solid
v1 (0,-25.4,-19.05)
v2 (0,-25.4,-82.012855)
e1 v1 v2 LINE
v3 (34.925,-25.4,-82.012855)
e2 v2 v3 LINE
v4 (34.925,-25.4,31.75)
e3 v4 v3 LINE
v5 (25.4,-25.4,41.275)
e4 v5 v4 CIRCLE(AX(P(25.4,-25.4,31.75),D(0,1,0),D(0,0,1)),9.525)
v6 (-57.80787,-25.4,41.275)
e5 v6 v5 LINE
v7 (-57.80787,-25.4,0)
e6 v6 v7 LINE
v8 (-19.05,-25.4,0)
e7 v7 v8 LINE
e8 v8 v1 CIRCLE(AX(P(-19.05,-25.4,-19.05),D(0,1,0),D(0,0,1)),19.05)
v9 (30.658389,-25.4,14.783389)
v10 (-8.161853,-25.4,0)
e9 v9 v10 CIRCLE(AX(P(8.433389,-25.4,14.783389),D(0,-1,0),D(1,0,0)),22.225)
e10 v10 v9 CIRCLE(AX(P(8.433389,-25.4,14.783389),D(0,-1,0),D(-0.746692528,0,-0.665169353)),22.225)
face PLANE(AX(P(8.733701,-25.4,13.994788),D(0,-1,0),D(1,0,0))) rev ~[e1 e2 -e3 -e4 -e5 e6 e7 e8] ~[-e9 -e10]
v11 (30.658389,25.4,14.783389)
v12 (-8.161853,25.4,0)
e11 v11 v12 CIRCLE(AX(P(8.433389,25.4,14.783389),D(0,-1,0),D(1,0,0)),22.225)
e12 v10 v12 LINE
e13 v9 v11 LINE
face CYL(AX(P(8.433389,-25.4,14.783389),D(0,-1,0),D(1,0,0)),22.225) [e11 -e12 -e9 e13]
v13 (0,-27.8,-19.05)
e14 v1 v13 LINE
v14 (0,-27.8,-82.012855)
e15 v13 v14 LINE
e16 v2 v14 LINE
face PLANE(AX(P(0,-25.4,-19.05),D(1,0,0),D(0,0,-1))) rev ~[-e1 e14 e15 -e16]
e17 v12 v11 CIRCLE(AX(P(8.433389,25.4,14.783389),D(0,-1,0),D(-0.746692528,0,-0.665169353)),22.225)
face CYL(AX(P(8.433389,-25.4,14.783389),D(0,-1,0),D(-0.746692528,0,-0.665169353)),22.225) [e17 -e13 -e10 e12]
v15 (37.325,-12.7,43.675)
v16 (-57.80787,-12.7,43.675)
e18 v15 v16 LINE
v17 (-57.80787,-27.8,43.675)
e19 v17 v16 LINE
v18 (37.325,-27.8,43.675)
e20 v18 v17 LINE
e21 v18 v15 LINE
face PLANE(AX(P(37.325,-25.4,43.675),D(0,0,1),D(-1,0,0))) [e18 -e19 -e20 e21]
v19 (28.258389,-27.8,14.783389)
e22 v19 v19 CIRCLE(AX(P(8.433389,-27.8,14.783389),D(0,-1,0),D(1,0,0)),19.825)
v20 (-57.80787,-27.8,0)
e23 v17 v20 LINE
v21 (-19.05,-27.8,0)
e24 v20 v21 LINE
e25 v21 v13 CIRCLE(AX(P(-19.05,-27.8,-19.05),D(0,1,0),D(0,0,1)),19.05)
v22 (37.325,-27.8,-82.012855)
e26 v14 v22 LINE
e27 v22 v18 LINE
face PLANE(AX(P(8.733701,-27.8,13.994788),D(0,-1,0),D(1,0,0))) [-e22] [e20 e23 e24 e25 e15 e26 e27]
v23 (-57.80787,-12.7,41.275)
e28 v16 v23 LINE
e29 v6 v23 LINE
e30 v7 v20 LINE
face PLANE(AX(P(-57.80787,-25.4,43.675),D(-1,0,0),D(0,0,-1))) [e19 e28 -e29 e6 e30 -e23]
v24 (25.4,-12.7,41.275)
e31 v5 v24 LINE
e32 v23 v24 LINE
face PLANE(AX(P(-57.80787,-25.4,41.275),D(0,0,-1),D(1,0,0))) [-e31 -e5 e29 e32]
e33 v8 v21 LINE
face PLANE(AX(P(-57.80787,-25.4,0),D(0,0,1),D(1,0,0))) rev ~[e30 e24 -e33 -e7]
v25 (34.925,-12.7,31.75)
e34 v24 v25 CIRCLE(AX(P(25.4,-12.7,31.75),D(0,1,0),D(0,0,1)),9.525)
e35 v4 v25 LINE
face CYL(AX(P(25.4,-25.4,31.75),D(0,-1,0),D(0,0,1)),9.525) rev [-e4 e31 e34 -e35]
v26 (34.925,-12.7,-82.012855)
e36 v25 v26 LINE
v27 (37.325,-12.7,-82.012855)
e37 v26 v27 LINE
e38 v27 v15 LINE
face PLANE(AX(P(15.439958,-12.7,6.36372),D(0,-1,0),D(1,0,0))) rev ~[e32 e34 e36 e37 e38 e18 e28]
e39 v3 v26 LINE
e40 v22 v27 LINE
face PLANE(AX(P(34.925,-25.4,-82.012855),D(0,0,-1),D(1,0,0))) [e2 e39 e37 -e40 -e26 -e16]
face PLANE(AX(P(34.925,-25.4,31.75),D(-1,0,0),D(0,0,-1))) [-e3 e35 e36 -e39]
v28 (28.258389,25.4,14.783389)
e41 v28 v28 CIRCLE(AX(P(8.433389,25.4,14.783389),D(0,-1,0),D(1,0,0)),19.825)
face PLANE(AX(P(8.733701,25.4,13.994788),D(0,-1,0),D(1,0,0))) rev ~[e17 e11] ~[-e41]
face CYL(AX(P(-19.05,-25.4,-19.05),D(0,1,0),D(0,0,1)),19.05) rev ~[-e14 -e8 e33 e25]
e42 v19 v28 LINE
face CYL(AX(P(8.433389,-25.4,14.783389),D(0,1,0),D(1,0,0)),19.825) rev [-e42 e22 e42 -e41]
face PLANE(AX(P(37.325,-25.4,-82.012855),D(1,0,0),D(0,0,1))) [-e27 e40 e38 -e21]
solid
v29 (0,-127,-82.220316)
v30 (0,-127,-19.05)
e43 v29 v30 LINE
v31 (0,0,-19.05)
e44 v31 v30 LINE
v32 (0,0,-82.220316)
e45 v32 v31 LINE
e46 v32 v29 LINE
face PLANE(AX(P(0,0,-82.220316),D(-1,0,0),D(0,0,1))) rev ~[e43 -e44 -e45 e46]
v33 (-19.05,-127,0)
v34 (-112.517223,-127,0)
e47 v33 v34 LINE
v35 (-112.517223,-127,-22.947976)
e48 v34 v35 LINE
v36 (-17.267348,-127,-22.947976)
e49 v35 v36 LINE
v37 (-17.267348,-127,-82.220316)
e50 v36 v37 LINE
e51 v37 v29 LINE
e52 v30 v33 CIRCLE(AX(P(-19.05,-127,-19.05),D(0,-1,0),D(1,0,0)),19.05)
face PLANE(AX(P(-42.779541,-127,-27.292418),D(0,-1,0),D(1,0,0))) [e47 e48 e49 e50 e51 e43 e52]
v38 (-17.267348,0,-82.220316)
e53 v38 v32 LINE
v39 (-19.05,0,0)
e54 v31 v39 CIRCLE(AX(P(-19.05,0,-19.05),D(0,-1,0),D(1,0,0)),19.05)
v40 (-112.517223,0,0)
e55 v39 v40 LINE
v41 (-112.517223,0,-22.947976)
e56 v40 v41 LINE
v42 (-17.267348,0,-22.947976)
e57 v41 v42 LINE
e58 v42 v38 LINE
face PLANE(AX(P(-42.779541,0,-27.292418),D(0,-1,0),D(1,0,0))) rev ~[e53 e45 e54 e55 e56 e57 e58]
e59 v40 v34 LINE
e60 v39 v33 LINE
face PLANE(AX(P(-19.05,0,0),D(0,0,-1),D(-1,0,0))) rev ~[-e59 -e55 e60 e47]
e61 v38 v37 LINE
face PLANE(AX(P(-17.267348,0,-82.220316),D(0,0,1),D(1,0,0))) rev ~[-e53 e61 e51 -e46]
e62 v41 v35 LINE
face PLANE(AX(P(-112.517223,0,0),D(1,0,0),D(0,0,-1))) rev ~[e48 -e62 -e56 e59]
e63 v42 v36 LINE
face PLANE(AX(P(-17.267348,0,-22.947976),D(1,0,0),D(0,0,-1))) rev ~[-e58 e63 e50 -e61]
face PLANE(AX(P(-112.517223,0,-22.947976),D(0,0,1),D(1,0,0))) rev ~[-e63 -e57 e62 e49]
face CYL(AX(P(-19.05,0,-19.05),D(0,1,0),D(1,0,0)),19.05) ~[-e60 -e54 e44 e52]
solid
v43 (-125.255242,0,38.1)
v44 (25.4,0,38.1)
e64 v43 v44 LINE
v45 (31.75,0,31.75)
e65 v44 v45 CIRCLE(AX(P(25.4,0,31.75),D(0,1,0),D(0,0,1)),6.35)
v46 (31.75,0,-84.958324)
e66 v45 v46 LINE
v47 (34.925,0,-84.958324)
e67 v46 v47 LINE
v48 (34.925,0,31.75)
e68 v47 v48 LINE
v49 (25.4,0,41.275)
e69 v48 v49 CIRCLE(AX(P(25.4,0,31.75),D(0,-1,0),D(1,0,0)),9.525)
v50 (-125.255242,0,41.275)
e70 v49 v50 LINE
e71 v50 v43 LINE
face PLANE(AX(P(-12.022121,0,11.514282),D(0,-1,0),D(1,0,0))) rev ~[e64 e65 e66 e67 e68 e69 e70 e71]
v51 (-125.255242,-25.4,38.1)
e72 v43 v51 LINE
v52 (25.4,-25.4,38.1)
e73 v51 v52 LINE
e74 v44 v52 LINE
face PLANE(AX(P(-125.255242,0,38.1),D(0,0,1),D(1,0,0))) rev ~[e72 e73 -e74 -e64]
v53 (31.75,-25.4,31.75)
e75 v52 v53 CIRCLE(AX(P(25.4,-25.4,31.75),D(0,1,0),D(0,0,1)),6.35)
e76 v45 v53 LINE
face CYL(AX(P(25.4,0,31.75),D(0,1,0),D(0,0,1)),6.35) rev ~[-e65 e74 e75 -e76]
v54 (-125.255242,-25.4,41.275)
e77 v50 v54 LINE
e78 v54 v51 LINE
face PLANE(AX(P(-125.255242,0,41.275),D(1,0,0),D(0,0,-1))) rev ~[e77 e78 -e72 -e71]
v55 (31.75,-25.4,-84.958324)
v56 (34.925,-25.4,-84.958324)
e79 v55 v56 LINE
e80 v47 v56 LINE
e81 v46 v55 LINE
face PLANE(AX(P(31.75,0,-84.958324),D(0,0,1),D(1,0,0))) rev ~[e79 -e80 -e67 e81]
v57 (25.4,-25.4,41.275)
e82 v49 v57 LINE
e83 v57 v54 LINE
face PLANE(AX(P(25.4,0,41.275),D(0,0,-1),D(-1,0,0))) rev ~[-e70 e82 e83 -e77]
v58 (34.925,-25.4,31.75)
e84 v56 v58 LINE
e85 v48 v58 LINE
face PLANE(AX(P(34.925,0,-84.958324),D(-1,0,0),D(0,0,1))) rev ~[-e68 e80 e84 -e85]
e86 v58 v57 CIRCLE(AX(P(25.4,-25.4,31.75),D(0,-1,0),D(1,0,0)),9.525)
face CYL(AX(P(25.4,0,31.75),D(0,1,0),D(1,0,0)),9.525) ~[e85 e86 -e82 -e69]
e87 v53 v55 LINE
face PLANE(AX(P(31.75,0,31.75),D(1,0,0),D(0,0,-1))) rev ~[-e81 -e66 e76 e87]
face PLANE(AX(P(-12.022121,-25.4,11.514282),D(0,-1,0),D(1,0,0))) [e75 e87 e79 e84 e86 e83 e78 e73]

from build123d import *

# Parameters (mm, degrees)
F1_DEPTH = 127
F2_DEPTH = 25.4
F4_DEPTH = 2.4
F3_R     = 19.825
F5_DEPTH = 2.4
F6_DEPTH = 50.8
F7_DEPTH = 12.7


# Not quite as in the source:
# - a length typed as a fraction of an inch, garbled in the dataset ("3 / 203.2 mm" for 3/8 in), is restored


with BuildPart() as f1:
    # F0 (on Front) → F1 (new body)
    with BuildSketch(Plane.XZ):
        with BuildLine():
            Line((0, -82.2203159332), (0, -19.05))
            ThreePointArc((0, -19.05), (-5.5796158184, -5.5796158184), (-19.05, 0))
            Line((-19.05, 0), (-112.5172227621, 0))
            Line((-112.5172227621, 0), (-112.5172227621, -22.9479763657))
            Line((-112.5172227621, -22.9479763657), (-17.2673482448, -22.9479763657))
            Line((-17.2673482448, -22.9479763657), (-17.2673482448, -82.2203159332))
            Line((-17.2673482448, -82.2203159332), (0, -82.2203159332))
        make_face()
    extrude(amount=F1_DEPTH)


with BuildPart() as f2:
    # F0 (on Front) → F2 (new body)
    with BuildSketch(Plane.XZ):
        with BuildLine():
            Line((-125.2552419901, 41.275), (-125.2552419901, 38.1))
            Line((-125.2552419901, 38.1), (25.4, 38.1))
            ThreePointArc((25.4, 38.1), (29.8901280605, 36.2401280605), (31.75, 31.75))
            Line((31.75, 31.75), (31.75, -84.9583235416))
            Line((31.75, -84.9583235416), (34.925, -84.9583235416))
            Line((34.925, -84.9583235416), (34.925, 31.75))
            ThreePointArc((34.925, 31.75), (32.1351920908, 38.4851920908), (25.4, 41.275))
            Line((25.4, 41.275), (-125.2552419901, 41.275))
        make_face()
    extrude(amount=F2_DEPTH)


with BuildPart() as f4:
    # F3 (on face) → F4 (new body)
    with BuildSketch(Plane.XZ.offset(25.4)):
        with BuildLine():
            ThreePointArc((-8.1618525748, 0), (0.5238571529, 35.5533174442), (30.6583888685, 14.7833888685))
            ThreePointArc((30.6583888685, 14.7833888685), (20.8131820291, -3.6744372847), (0, -5.7794070793))
            Line((0, -5.7794070793), (0, -19.05))
            Line((0, -19.05), (0, -82.0128545165))
            Line((0, -82.0128545165), (31.75, -82.0128545165))
            Line((31.75, -82.0128545165), (31.75, 31.75))
            ThreePointArc((31.75, 31.75), (29.8901280605, 36.2401280605), (25.4, 38.1))
            Line((25.4, 38.1), (-57.8078702092, 38.1))
            Line((-57.8078702092, 38.1), (-57.8078702092, 0))
            Line((-57.8078702092, 0), (-19.05, 0))
            Line((-19.05, 0), (-8.1618525748, 0))
        make_face()
        with BuildLine():
            ThreePointArc((0, -5.7794070793), (-4.4102270697, -3.3547520128), (-8.1618525748, 0))
            Line((-8.1618525748, 0), (-19.05, 0))
            ThreePointArc((-19.05, 0), (-5.5796158184, -5.5796158184), (0, -19.05))
            Line((0, -19.05), (0, -5.7794070793))
        make_face()
        with BuildLine():
            Line((-57.8078702092, 41.275), (-57.8078702092, 38.1))
            Line((-57.8078702092, 38.1), (25.4, 38.1))
            ThreePointArc((25.4, 38.1), (29.8901280605, 36.2401280605), (31.75, 31.75))
            Line((31.75, 31.75), (31.75, -82.0128545165))
            Line((31.75, -82.0128545165), (34.925, -82.0128545165))
            Line((34.925, -82.0128545165), (34.925, 31.75))
            ThreePointArc((34.925, 31.75), (32.1351920908, 38.4851920908), (25.4, 41.275))
            Line((25.4, 41.275), (-57.8078702092, 41.275))
        make_face()
        with BuildLine():
            Line((-57.8078702092, 43.675), (-57.8078702092, 41.275))
            Line((-57.8078702092, 41.275), (25.4, 41.275))
            ThreePointArc((25.4, 41.275), (32.1351920908, 38.4851920908), (34.925, 31.75))
            Line((34.925, 31.75), (34.925, -82.0128545165))
            Line((34.925, -82.0128545165), (37.325, -82.0128545165))
            Line((37.325, -82.0128545165), (37.325, 43.675))
            Line((37.325, 43.675), (-57.8078702092, 43.675))
        make_face()
    extrude(amount=F4_DEPTH)

    # F3 (on face) → F5 (join, through all)
    with BuildSketch(Plane.XZ.offset(25.4)):
        with BuildLine():
            ThreePointArc((0, -5.7794070793), (20.8131820291, -3.6744372847), (30.6583888685, 14.7833888685))
            ThreePointArc((30.6583888685, 14.7833888685), (0.5238571529, 35.5533174442), (-8.1618525748, 0))
            ThreePointArc((-8.1618525748, 0), (-4.4102270697, -3.3547520128), (0, -5.7794070793))
        make_face()
        with Locations((8.4333888685, 14.7833888685)):
            Circle(F3_R, mode=Mode.SUBTRACT)
    extrude(amount=F5_DEPTH)

    # F3 (on face) → F6 (join)
    with BuildSketch(Plane.XZ.offset(25.4)):
        with BuildLine():
            ThreePointArc((0, -5.7794070793), (20.8131820291, -3.6744372847), (30.6583888685, 14.7833888685))
            ThreePointArc((30.6583888685, 14.7833888685), (0.5238571529, 35.5533174442), (-8.1618525748, 0))
            ThreePointArc((-8.1618525748, 0), (-4.4102270697, -3.3547520128), (0, -5.7794070793))
        make_face()
        with Locations((8.4333888685, 14.7833888685)):
            Circle(F3_R, mode=Mode.SUBTRACT)
    extrude(amount=-F6_DEPTH)

    # F3 (on face) → F7 (join)
    with BuildSketch(Plane.XZ.offset(25.4)):
        with BuildLine():
            Line((-57.8078702092, 43.675), (-57.8078702092, 41.275))
            Line((-57.8078702092, 41.275), (25.4, 41.275))
            ThreePointArc((25.4, 41.275), (32.1351920908, 38.4851920908), (34.925, 31.75))
            Line((34.925, 31.75), (34.925, -82.0128545165))
            Line((34.925, -82.0128545165), (37.325, -82.0128545165))
            Line((37.325, -82.0128545165), (37.325, 43.675))
            Line((37.325, 43.675), (-57.8078702092, 43.675))
        make_face()
    extrude(amount=-F7_DEPTH)


solid = Compound([f1.part, f2.part, f4.part])
